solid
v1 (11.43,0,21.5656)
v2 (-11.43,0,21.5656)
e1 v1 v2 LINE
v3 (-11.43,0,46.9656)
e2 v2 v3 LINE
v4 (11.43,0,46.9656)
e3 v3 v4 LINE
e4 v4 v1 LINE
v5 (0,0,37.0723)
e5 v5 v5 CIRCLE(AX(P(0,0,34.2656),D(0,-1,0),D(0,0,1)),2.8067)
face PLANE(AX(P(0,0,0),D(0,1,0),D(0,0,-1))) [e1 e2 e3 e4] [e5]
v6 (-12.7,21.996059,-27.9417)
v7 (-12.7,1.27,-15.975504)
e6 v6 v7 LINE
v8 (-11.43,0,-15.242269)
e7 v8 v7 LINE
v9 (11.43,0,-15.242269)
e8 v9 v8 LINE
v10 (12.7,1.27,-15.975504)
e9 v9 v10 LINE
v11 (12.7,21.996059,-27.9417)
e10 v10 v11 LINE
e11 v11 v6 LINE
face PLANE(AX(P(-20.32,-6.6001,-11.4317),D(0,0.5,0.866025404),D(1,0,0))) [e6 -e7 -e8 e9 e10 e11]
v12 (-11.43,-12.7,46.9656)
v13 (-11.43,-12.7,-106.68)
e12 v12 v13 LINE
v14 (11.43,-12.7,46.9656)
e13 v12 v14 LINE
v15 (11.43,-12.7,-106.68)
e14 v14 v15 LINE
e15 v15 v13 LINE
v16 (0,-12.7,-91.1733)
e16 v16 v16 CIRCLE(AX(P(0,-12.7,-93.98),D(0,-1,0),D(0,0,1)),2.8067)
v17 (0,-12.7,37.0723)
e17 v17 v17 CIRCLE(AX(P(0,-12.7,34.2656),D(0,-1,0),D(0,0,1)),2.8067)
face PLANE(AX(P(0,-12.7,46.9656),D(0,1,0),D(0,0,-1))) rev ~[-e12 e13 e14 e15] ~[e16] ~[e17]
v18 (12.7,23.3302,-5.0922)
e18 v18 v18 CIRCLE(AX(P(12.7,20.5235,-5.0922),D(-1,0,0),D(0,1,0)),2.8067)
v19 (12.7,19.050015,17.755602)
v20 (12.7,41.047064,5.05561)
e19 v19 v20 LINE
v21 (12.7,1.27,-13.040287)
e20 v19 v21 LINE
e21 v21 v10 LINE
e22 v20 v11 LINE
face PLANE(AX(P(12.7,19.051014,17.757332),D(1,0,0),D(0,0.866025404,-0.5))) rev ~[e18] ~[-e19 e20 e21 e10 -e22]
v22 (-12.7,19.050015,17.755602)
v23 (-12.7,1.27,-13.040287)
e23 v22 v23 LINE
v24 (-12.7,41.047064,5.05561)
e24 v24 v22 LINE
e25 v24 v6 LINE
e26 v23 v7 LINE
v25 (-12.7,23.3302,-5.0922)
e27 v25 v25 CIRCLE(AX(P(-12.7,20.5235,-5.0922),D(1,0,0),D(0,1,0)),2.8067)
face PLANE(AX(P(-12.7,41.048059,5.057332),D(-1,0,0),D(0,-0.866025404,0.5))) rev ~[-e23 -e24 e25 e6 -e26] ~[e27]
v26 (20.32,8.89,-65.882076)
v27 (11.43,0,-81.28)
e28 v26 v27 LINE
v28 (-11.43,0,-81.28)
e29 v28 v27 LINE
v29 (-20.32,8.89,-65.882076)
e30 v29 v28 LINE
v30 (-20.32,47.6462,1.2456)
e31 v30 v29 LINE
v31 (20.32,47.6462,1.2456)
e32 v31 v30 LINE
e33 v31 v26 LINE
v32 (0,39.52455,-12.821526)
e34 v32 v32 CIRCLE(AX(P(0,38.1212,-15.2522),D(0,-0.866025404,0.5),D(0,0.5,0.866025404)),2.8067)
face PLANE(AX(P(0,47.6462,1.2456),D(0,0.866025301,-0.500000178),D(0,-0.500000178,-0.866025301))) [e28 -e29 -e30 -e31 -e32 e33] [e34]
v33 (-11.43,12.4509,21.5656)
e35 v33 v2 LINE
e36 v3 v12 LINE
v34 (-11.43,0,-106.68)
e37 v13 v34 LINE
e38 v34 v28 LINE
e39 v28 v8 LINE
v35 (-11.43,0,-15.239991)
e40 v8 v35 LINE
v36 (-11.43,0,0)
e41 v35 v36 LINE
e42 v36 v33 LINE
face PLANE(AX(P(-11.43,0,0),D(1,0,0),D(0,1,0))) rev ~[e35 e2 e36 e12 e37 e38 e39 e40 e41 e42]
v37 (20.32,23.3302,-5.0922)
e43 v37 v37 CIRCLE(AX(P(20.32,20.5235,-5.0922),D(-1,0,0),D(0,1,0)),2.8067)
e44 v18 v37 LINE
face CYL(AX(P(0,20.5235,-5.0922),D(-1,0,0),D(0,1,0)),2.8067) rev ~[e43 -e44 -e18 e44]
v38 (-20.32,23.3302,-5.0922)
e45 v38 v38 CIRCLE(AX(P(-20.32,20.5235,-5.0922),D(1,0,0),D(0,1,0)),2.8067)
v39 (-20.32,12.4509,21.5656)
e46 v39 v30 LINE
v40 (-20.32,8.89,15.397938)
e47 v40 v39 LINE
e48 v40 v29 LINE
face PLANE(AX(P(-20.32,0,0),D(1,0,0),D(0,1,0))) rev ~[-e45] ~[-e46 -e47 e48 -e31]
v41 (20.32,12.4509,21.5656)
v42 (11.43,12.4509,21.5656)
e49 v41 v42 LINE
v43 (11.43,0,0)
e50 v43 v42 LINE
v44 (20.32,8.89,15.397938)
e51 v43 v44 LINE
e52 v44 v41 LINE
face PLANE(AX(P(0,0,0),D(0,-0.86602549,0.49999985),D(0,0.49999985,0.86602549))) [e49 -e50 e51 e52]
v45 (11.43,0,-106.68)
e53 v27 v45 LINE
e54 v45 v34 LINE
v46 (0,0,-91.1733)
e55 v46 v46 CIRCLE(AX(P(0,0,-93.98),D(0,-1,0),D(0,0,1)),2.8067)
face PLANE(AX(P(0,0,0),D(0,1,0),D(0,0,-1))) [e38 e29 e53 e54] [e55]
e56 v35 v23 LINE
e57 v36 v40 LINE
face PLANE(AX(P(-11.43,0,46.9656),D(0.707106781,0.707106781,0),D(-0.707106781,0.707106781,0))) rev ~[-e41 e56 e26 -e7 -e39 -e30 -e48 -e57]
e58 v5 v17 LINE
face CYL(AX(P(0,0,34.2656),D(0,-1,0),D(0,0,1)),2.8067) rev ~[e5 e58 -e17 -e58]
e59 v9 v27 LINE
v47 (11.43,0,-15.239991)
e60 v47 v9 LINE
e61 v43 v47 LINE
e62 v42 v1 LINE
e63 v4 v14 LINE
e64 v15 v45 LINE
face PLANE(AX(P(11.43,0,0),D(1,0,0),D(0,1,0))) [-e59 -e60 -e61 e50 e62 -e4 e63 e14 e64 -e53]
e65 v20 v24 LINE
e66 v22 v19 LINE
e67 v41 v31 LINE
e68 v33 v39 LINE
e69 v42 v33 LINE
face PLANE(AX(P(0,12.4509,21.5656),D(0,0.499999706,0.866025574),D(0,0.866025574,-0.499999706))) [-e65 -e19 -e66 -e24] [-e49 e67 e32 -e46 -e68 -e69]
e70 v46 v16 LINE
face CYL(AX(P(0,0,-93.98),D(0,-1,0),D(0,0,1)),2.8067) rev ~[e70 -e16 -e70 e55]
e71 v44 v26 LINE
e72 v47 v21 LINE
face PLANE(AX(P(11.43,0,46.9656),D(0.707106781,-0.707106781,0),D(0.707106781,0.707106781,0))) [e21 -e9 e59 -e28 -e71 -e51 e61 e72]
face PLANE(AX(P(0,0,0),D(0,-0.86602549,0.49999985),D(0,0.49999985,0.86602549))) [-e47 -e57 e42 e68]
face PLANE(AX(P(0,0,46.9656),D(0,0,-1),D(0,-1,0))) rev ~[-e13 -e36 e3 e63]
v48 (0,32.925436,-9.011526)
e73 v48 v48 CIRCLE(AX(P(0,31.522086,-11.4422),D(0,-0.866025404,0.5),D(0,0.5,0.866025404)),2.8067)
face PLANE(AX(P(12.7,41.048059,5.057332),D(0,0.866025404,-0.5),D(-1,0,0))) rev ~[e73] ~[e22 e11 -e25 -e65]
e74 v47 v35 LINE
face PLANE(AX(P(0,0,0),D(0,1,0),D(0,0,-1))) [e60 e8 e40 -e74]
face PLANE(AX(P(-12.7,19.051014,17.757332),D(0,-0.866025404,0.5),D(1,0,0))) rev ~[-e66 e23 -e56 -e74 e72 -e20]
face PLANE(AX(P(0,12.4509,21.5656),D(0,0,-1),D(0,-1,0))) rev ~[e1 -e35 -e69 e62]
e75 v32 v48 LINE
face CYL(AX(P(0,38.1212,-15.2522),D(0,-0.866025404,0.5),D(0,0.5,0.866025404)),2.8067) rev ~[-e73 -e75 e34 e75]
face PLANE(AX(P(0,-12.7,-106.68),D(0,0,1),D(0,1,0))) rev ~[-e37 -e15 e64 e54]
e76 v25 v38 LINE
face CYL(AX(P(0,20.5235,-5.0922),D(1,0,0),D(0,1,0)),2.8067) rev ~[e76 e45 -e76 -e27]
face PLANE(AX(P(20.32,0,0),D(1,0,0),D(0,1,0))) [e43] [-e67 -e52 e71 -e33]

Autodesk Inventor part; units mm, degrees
ref_plane "YZ Plane" through (0, 0, 0) normal (1, 0, 0) x (0, 1, 0)
ref_plane "XZ Plane" through (0, 0, 0) normal (0, 1, 0) x (-1, 0, 0)
ref_plane "XY Plane" through (0, 0, 0) normal (0, 0, 1) x (1, 0, 0)
sketch "Sketch1" plane through (0, 0, 0) normal (1, 0, 0) x (0, 1, 0)
  line L0 (0, 0) -> (12.4509, 21.5656)
  line L1 (12.4509, 21.5656) -> (47.6462, 1.2456)
  line L2 (0, -101.8491) -> (0, 42.1347) projected
  line L3 (47.6462, 1.2456) -> (0, -81.28)
  line L4 (0, 0) -> (0, -81.28)
  line L5 (19.05, 17.7556) -> (0, -15.24) construction
  dimension "d0" = 40.64
  dimension "d1" = 30
  dimension "d5" = 7.62
  dimension "d6" = 38.1
extrude "Extrusion1" add sketch "Sketch1" along normal mid plane 40.64
sketch "Sketch2" plane through (-20.32, 12.4509, 21.5656) normal (0, 0.5, 0.8660254) x (1, 0, 0)
  line L0 (0, 0) -> (40.64, 0) construction
  line L1 (40.64, 0) -> (40.64, 40.64) construction
  line L2 (0, 0) -> (40.64, 40.64) construction
  line L3 (40.64, 40.64) -> (0, 40.64) construction
  line L4 (0, 40.64) -> (40.64, 0) construction
  line L5 (7.62, 7.62) -> (33.02, 7.62)
  line L6 (33.02, 7.62) -> (33.02, 33.02)
  line L7 (33.02, 33.02) -> (7.62, 33.02)
  line L8 (7.62, 33.02) -> (7.62, 7.62)
  line L9 (7.62, 7.62) -> (33.02, 33.02) construction
  line L10 (33.02, 7.62) -> (7.62, 33.02) construction
  point P0 (20.32, 0)
  point P1 (20.32, 20.32)
  dimension "d7" = 25.4
extrude "Extrusion2" cut sketch "Sketch2" against normal blind 38.1
sketch "Sketch3" plane through (0, 0, 0) normal (1, 0, 0) x (0, 1, 0)
  line L0 (12.4509, 21.5656) -> (0, 0) projected
  line L1 (0, 0) -> (0, -81.28) projected
  line L2 (0, -81.28) -> (47.6462, 1.2456) projected
  line L3 (21.997, -27.94) -> (0, -15.24) projected
  line L4 (19.05, 17.7556) -> (0, -15.24) projected
  line L5 (0, 0) -> (0, -81.28)
  line L6 (12.4509, 21.5656) -> (-1.0999, 21.5656) construction
  line L7 (0, 0) -> (12.4509, 21.5656) projected
  line L8 (0, 0) -> (0, 46.9656)
  line L9 (47.6462, 1.2456) -> (0, -81.28) projected
  line L10 (0, -81.28) -> (0, -106.68)
  line L11 (0, -137.7901) -> (0, 79.9807) projected
  line L12 (0, 46.9656) -> (-12.7, 46.9656)
  line L13 (-12.7, 46.9656) -> (-12.7, -106.68)
  line L14 (-12.7, -106.68) -> (0, -106.68)
  point P0 (1.0999, -13.335)
  dimension "d10" = 25.4
  dimension "d11" = 25.4
  dimension "d12" = 12.7
  dimension "supportBaseLength" = 153.6456
extrude "Extrusion3" add sketch "Sketch3" along normal mid plane 22.86
sketch "Sketch5" plane through (0, 0, 0) normal (1, 0, 0) x (0, 1, 0)
  line L0 (0, 0) -> (12.4509, 21.5656) projected
  line L1 (0, 46.9656) -> (0, 0) projected
  line L2 (12.4509, 21.5656) -> (47.6462, 1.2456) projected
  line L3 (12.4509, 21.5656) -> (0, 21.5656)
  line L4 (0, 0) -> (12.4509, 21.5656)
extrude "Extrusion5" add sketch "Sketch5" along normal mid plane 22.86
sketch "Sketch4" plane through (0, 0, 0) normal (0, 0, 1) x (1, 0, 0)
  line L0 (20.32, 47.6462) -> (-20.32, 47.6462) projected
  line L1 (20.32, 0) -> (20.32, 47.6462) projected
  line L2 (20.32, 0) -> (11.43, 0) projected
  line L3 (11.43, 0) -> (-11.43, 0) projected
  line L4 (-11.43, 0) -> (-20.32, 0) projected
  line L5 (-20.32, 47.6462) -> (-20.32, 0) projected
  line L6 (-11.43, 0) -> (-11.43, -12.7) projected
  line L7 (11.43, -12.7) -> (-11.43, -12.7) projected
  line L8 (11.43, -12.7) -> (11.43, 0) projected
  line L9 (-11.43, 0) -> (-20.32, 8.89)
  line L10 (-20.32, 47.6462) -> (-20.32, 0) projected
  line L11 (-20.32, 8.89) -> (-20.32, 0)
  line L12 (0, 0) -> (0, 47.6462) construction
  line L13 (11.43, 0) -> (20.32, 0)
  line L14 (11.43, 0) -> (20.32, 8.89)
  line L15 (20.32, 8.89) -> (20.32, 0)
  dimension "d15" = 45
extrude "Extrusion4" cut sketch "Sketch4" against normal up to surface (153.6456 mm away) from surface at 46.9656 contours L1 L2 L14 | L9 L4 L5
sketch "Sketch6" plane through (-11.43, 0, 46.9656) normal (0, 1, 0) x (1, 0, 0)
  line L0 (22.86, 153.6456) -> (0, 153.6456) construction
  line L1 (11.43, 153.6456) -> (11.43, 0) construction
  line L2 (22.86, 0) -> (0, 0) construction
  point P0 (11.43, 46.9656)
  point P1 (11.43, 140.9456)
  point P2 (11.43, 12.7)
  dimension "d21" = 12.7
  dimension "d22" = 12.7
hole "Hole1" at (0, 0, -93.98) at (0, 0, 34.2656) direction (0, -1, 0) diameter 5.6134 end through all clearance for "Flat Head Machine Screw (82)" size "#10" standard "Ansi Unified Screw Threads"
sketch "Sketch9" plane through (0, 0, 0) normal (1, 0, 0) x (0, 1, 0)
  line L0 (1.27, -13.0403) -> (1.27, -15.9732) projected
  line L1 (1.27, -15.9732) -> (21.997, -27.94) projected
  line L2 (41.047, 5.0556) -> (21.997, -27.94) projected
  line L3 (19.05, 17.7556) -> (41.047, 5.0556) projected
  line L4 (19.05, 17.7556) -> (1.27, -13.0403) projected
  line L5 (30.0485, 11.4056) -> (10.9985, -21.59) construction
  line L6 (1.27, -15.9732) -> (21.997, -27.94) construction
  circle A0 centre (20.5235, -5.0922) radius 2.8067
  point P0 (0, 0)
  dimension "d30" = 5.6134
extrude "Extrusion6" cut sketch "Sketch9" along normal through all both and the other way through all contours A0
sketch "Sketch10" plane through (-20.32, 47.6462, 1.2456) normal (0, 0.8660254, -0.5) x (1, 0, 0)
  line L0 (7.62, 0) -> (33.02, 0) construction
  line L1 (20.32, 0) -> (20.32, 77.7875) construction
  point P0 (20.32, 24.9018)
  point P1 (20.32, 19.05)
  dimension "d33" = 19.05
hole "Hole2" at (0, 38.1212, -15.2522) direction (0, -0.8660254, 0.5) diameter 5.6134 depth 7.62 clearance for "Flat Head Machine Screw (82)" size "#10" standard "Ansi Unified Screw Threads"
equation "\"d0\" = widthToSupportExtrusion"
equation "\"d1\" = attachementAngle"
equation "\"d6\" = insertDepth"
equation "\"d2\" = widthToSupportExtrusion"
equation "\"d7\" = extrusionSize"
equation "\"d8\" = insertDepth"
equation "\"d12\" = supportBaseDepth"
equation "\"d13\" = supportBaseWidth"
equation "\"attachementAngle\" = 30deg"
equation "\"extrusionSize\" = 25.4"
equation "\"wallThickness\" = 6.35"
equation "\"slipClearance\" = 1.27"
equation "\"insertForExtrusion\" = extrusionSize + 2 * slipClearance"
equation "\"widthToSupportExtrusion\" = insertForExtrusion + 2 * wallThickness"
equation "\"insertDepth\" = 38.1"
equation "\"supportBaseWidth\" = 22.86"
equation "\"supportBaseDepth\" = 12.7"
properties part number "30DegreeAttachementV02"
